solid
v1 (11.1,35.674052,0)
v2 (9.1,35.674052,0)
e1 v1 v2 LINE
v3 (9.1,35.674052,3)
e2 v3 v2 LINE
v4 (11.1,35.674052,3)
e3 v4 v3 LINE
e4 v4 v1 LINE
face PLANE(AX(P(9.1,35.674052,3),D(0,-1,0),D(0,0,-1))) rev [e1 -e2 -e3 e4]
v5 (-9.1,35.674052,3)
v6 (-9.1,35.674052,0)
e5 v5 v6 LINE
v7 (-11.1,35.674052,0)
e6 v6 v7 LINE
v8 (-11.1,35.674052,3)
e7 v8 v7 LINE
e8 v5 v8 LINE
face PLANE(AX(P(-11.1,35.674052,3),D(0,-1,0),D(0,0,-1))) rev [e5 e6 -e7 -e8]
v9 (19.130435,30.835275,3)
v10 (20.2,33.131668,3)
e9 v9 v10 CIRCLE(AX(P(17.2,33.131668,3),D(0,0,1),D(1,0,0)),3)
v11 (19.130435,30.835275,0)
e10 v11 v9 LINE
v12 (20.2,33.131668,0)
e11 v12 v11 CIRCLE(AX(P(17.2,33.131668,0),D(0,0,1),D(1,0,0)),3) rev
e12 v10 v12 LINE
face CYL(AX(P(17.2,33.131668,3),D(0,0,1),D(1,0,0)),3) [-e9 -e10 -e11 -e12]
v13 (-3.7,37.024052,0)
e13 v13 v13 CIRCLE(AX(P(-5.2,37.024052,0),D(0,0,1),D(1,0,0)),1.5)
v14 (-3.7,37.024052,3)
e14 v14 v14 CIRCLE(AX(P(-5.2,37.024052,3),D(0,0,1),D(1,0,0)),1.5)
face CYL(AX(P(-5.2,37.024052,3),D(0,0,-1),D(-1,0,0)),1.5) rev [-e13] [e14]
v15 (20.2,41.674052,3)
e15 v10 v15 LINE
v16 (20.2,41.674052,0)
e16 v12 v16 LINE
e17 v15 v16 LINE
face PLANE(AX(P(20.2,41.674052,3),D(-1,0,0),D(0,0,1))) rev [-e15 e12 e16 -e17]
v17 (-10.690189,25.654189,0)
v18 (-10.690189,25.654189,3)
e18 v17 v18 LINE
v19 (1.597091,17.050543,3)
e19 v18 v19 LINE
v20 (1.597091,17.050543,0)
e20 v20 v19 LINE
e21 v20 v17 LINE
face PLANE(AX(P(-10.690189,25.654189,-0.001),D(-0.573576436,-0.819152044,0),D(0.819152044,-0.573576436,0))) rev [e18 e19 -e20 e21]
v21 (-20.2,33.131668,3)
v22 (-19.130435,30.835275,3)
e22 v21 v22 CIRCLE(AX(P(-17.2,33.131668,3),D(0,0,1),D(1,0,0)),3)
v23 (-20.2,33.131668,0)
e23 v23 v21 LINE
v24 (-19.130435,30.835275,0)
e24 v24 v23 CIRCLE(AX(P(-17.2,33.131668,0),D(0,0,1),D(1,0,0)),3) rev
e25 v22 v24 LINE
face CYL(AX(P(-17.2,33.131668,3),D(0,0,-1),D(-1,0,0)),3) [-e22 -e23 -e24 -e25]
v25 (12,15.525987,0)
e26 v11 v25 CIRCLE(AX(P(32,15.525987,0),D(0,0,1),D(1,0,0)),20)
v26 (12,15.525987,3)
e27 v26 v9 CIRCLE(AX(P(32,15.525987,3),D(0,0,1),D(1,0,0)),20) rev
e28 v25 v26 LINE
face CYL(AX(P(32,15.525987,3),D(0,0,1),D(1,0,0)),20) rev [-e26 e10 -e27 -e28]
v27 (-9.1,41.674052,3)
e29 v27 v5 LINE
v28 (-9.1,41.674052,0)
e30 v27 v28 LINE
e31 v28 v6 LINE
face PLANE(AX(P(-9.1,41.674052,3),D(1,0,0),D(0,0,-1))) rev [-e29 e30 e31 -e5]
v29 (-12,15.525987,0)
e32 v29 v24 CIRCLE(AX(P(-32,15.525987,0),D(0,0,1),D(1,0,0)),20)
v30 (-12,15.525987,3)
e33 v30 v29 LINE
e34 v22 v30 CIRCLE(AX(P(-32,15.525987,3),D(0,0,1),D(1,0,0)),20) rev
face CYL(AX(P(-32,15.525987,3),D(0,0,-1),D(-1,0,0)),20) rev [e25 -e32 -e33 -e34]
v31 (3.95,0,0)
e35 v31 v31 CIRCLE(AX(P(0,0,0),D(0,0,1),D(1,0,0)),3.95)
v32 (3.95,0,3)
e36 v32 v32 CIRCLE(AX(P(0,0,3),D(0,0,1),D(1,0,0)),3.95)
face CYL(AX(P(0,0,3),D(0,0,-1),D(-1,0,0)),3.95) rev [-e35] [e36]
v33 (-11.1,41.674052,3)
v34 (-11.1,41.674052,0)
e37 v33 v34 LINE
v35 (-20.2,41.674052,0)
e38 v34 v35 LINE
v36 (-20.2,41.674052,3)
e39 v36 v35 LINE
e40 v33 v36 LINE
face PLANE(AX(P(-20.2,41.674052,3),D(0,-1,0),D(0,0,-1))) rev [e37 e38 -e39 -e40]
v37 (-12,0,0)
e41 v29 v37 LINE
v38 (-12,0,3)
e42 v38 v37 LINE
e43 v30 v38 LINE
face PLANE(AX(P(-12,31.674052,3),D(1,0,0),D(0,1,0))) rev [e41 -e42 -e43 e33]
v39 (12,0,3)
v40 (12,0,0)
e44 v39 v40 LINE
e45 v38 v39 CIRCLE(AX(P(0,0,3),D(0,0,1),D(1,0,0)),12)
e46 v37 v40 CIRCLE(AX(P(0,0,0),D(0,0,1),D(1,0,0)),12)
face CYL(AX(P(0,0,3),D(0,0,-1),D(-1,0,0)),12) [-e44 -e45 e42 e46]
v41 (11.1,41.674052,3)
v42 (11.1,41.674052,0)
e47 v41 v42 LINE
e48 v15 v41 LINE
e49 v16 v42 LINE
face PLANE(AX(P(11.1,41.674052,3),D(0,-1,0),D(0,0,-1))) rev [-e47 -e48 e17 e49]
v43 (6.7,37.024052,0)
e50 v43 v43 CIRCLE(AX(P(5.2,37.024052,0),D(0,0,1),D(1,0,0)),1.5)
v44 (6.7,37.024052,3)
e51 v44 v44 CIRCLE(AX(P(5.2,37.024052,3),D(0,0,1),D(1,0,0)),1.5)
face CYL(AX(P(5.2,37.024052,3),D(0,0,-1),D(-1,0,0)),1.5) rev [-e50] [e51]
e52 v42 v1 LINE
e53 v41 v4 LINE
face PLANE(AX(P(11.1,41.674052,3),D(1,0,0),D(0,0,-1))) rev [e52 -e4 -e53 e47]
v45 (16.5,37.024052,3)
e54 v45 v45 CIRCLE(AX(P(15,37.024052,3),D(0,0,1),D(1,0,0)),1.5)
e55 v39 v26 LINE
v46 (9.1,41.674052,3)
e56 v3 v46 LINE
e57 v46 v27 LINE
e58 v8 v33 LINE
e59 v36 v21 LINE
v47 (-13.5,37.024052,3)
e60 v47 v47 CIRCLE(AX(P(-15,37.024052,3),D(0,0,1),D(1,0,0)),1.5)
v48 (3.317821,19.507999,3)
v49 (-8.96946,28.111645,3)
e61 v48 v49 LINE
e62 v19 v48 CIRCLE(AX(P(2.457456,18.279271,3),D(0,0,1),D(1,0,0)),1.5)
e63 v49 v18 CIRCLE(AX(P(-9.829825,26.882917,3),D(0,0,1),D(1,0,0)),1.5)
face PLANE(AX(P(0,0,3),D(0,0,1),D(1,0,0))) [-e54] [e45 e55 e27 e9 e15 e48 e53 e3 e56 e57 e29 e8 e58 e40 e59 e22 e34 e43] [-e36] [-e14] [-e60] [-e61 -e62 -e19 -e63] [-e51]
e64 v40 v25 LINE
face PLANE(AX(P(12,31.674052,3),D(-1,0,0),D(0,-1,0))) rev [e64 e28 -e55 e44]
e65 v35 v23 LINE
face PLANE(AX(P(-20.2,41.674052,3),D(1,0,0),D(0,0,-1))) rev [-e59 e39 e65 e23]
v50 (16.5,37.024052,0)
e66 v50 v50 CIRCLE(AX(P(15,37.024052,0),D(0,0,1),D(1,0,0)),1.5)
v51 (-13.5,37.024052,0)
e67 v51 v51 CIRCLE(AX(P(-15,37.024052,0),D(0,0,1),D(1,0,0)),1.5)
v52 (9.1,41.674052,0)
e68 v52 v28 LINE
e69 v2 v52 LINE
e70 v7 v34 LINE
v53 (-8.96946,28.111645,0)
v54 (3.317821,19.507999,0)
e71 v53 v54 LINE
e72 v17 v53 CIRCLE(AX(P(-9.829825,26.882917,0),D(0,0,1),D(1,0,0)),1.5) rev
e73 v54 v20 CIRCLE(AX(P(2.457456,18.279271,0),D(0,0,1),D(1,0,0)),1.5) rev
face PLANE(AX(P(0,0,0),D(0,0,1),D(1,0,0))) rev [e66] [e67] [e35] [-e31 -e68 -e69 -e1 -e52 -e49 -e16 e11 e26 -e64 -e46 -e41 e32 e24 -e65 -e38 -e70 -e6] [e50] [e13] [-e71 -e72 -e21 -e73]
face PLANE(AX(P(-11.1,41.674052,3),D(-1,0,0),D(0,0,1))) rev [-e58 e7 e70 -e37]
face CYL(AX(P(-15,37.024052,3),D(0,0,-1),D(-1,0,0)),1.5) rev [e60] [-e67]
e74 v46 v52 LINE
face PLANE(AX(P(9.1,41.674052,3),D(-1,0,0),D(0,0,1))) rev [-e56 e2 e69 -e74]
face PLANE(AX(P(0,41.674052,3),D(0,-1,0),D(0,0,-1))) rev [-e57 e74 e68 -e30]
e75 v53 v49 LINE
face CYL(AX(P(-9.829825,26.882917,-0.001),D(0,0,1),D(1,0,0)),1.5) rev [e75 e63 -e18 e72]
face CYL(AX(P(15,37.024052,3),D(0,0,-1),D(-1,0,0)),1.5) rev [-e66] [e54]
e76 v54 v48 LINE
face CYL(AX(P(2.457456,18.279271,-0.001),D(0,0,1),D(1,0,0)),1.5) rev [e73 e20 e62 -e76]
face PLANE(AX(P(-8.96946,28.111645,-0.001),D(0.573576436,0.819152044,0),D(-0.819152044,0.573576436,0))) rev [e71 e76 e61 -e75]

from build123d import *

# Parameters (mm, degrees)
SKETCH1_R           = 3.95
SKETCH1_R_2         = 1.5
BOSS_EXTRUDE1_DEPTH = 3
FILLET1_R           = 20
FILLET2_R           = 3
CUT_EXTRUDE1_DEPTH  = 3


with BuildPart() as part:
    # Sketch1 → Boss-Extrude1 (new body)
    with BuildSketch(Plane.XY):
        with BuildLine():
            Line((0, 41.674052381), (9.1, 41.674052381))
            Line((9.1, 41.674052381), (9.1, 35.674052381))
            Line((9.1, 35.674052381), (11.1, 35.674052381))
            Line((11.1, 35.674052381), (11.1, 41.674052381))
            Line((11.1, 41.674052381), (20.2, 41.674052381))
            Line((20.2, 41.674052381), (20.2, 31.674052381))
            Line((20.2, 31.674052381), (12, 31.674052381))
            Line((12, 31.674052381), (12, 0))
            ThreePointArc((12, 0), (0, -12), (-12, 0))
            Line((-12, 0), (-12, 31.674052381))
            Line((-12, 31.674052381), (-20.2, 31.674052381))
            Line((-20.2, 31.674052381), (-20.2, 41.674052381))
            Line((-20.2, 41.674052381), (-11.1, 41.674052381))
            Line((-11.1, 41.674052381), (-11.1, 35.674052381))
            Line((-11.1, 35.674052381), (-9.1, 35.674052381))
            Line((-9.1, 35.674052381), (-9.1, 41.674052381))
            Line((-9.1, 41.674052381), (0, 41.674052381))
        make_face()
        Circle(SKETCH1_R, mode=Mode.SUBTRACT)
        with Locations((-15, 37.024052381)):
            Circle(SKETCH1_R_2, mode=Mode.SUBTRACT)
        with Locations((-5.2, 37.024052381)):
            Circle(SKETCH1_R_2, mode=Mode.SUBTRACT)
        with Locations((5.2, 37.024052381)):
            Circle(SKETCH1_R_2, mode=Mode.SUBTRACT)
        with Locations((15, 37.024052381)):
            Circle(SKETCH1_R_2, mode=Mode.SUBTRACT)
    extrude(amount=BOSS_EXTRUDE1_DEPTH)

    # Fillet1
    # the kernel refuses this fillet: 20 mm, written as the material it adds along each edge
    with BuildSketch(Plane(origin=(-12, 31.674052381, 0), x_dir=(0, -1, 0), z_dir=(0, 0, 1))) as fillet1_piece_1:
        with BuildLine():
            CenterArc((16.1480649, -20), FILLET1_R, 90, 53.842991799)
            Line((0, -8.2), (-0.322961298, -7.964))
            ThreePointArc((-0.322961298, -7.964), (-0.4, -4.1), (-0.4, 0))
            Line((-0.4, 0), (0, 0.4))
            Line((0, 0.4), (16.1480649, 0.4))
            Line((16.1480649, 0.4), (16.1480649, 0))
        make_face()
    extrude(amount=3)
    with BuildSketch(Plane(origin=(12, 31.674052381, 0), x_dir=(0, -1, 0), z_dir=(0, 0, 1))) as fillet1_piece_2:
        with BuildLine():
            CenterArc((16.1480649, 20), FILLET1_R, 216.157008201, 53.842991799)
            Line((0, 8.2), (-0.322961298, 7.964))
            ThreePointArc((-0.322961298, 7.964), (-0.4, 4.1), (-0.4, 0))
            Line((-0.4, 0), (0, -0.4))
            Line((0, -0.4), (16.1480649, -0.4))
            Line((16.1480649, -0.4), (16.1480649, 0))
        make_face()
    extrude(amount=3)

    # Fillet2
    fillet2_edges = [part.edges().sort_by_distance(p)[0] for p in [
        (20.2, 31.674052381, 1.5),
        (-20.2, 31.674052381, 1.5),
    ]]
    fillet(fillet2_edges, radius=FILLET2_R)

    # Sketch2 → Cut-Extrude1 (cut)
    with BuildSketch(Plane.XY.offset(3)):
        with BuildLine():
            Line((-10.690189186, 25.65418917), (1.597091478, 17.050542625))
            ThreePointArc((1.597091478, 17.050542625), (3.686184199, 17.418906036), (3.317820787, 19.507998757))
            Line((3.317820787, 19.507998757), (-8.969459877, 28.111645303))
            ThreePointArc((-8.969459877, 28.111645303), (-11.058552598, 27.743281891), (-10.690189186, 25.65418917))
        make_face()
    extrude(amount=-CUT_EXTRUDE1_DEPTH, mode=Mode.SUBTRACT)


solid = part.part
